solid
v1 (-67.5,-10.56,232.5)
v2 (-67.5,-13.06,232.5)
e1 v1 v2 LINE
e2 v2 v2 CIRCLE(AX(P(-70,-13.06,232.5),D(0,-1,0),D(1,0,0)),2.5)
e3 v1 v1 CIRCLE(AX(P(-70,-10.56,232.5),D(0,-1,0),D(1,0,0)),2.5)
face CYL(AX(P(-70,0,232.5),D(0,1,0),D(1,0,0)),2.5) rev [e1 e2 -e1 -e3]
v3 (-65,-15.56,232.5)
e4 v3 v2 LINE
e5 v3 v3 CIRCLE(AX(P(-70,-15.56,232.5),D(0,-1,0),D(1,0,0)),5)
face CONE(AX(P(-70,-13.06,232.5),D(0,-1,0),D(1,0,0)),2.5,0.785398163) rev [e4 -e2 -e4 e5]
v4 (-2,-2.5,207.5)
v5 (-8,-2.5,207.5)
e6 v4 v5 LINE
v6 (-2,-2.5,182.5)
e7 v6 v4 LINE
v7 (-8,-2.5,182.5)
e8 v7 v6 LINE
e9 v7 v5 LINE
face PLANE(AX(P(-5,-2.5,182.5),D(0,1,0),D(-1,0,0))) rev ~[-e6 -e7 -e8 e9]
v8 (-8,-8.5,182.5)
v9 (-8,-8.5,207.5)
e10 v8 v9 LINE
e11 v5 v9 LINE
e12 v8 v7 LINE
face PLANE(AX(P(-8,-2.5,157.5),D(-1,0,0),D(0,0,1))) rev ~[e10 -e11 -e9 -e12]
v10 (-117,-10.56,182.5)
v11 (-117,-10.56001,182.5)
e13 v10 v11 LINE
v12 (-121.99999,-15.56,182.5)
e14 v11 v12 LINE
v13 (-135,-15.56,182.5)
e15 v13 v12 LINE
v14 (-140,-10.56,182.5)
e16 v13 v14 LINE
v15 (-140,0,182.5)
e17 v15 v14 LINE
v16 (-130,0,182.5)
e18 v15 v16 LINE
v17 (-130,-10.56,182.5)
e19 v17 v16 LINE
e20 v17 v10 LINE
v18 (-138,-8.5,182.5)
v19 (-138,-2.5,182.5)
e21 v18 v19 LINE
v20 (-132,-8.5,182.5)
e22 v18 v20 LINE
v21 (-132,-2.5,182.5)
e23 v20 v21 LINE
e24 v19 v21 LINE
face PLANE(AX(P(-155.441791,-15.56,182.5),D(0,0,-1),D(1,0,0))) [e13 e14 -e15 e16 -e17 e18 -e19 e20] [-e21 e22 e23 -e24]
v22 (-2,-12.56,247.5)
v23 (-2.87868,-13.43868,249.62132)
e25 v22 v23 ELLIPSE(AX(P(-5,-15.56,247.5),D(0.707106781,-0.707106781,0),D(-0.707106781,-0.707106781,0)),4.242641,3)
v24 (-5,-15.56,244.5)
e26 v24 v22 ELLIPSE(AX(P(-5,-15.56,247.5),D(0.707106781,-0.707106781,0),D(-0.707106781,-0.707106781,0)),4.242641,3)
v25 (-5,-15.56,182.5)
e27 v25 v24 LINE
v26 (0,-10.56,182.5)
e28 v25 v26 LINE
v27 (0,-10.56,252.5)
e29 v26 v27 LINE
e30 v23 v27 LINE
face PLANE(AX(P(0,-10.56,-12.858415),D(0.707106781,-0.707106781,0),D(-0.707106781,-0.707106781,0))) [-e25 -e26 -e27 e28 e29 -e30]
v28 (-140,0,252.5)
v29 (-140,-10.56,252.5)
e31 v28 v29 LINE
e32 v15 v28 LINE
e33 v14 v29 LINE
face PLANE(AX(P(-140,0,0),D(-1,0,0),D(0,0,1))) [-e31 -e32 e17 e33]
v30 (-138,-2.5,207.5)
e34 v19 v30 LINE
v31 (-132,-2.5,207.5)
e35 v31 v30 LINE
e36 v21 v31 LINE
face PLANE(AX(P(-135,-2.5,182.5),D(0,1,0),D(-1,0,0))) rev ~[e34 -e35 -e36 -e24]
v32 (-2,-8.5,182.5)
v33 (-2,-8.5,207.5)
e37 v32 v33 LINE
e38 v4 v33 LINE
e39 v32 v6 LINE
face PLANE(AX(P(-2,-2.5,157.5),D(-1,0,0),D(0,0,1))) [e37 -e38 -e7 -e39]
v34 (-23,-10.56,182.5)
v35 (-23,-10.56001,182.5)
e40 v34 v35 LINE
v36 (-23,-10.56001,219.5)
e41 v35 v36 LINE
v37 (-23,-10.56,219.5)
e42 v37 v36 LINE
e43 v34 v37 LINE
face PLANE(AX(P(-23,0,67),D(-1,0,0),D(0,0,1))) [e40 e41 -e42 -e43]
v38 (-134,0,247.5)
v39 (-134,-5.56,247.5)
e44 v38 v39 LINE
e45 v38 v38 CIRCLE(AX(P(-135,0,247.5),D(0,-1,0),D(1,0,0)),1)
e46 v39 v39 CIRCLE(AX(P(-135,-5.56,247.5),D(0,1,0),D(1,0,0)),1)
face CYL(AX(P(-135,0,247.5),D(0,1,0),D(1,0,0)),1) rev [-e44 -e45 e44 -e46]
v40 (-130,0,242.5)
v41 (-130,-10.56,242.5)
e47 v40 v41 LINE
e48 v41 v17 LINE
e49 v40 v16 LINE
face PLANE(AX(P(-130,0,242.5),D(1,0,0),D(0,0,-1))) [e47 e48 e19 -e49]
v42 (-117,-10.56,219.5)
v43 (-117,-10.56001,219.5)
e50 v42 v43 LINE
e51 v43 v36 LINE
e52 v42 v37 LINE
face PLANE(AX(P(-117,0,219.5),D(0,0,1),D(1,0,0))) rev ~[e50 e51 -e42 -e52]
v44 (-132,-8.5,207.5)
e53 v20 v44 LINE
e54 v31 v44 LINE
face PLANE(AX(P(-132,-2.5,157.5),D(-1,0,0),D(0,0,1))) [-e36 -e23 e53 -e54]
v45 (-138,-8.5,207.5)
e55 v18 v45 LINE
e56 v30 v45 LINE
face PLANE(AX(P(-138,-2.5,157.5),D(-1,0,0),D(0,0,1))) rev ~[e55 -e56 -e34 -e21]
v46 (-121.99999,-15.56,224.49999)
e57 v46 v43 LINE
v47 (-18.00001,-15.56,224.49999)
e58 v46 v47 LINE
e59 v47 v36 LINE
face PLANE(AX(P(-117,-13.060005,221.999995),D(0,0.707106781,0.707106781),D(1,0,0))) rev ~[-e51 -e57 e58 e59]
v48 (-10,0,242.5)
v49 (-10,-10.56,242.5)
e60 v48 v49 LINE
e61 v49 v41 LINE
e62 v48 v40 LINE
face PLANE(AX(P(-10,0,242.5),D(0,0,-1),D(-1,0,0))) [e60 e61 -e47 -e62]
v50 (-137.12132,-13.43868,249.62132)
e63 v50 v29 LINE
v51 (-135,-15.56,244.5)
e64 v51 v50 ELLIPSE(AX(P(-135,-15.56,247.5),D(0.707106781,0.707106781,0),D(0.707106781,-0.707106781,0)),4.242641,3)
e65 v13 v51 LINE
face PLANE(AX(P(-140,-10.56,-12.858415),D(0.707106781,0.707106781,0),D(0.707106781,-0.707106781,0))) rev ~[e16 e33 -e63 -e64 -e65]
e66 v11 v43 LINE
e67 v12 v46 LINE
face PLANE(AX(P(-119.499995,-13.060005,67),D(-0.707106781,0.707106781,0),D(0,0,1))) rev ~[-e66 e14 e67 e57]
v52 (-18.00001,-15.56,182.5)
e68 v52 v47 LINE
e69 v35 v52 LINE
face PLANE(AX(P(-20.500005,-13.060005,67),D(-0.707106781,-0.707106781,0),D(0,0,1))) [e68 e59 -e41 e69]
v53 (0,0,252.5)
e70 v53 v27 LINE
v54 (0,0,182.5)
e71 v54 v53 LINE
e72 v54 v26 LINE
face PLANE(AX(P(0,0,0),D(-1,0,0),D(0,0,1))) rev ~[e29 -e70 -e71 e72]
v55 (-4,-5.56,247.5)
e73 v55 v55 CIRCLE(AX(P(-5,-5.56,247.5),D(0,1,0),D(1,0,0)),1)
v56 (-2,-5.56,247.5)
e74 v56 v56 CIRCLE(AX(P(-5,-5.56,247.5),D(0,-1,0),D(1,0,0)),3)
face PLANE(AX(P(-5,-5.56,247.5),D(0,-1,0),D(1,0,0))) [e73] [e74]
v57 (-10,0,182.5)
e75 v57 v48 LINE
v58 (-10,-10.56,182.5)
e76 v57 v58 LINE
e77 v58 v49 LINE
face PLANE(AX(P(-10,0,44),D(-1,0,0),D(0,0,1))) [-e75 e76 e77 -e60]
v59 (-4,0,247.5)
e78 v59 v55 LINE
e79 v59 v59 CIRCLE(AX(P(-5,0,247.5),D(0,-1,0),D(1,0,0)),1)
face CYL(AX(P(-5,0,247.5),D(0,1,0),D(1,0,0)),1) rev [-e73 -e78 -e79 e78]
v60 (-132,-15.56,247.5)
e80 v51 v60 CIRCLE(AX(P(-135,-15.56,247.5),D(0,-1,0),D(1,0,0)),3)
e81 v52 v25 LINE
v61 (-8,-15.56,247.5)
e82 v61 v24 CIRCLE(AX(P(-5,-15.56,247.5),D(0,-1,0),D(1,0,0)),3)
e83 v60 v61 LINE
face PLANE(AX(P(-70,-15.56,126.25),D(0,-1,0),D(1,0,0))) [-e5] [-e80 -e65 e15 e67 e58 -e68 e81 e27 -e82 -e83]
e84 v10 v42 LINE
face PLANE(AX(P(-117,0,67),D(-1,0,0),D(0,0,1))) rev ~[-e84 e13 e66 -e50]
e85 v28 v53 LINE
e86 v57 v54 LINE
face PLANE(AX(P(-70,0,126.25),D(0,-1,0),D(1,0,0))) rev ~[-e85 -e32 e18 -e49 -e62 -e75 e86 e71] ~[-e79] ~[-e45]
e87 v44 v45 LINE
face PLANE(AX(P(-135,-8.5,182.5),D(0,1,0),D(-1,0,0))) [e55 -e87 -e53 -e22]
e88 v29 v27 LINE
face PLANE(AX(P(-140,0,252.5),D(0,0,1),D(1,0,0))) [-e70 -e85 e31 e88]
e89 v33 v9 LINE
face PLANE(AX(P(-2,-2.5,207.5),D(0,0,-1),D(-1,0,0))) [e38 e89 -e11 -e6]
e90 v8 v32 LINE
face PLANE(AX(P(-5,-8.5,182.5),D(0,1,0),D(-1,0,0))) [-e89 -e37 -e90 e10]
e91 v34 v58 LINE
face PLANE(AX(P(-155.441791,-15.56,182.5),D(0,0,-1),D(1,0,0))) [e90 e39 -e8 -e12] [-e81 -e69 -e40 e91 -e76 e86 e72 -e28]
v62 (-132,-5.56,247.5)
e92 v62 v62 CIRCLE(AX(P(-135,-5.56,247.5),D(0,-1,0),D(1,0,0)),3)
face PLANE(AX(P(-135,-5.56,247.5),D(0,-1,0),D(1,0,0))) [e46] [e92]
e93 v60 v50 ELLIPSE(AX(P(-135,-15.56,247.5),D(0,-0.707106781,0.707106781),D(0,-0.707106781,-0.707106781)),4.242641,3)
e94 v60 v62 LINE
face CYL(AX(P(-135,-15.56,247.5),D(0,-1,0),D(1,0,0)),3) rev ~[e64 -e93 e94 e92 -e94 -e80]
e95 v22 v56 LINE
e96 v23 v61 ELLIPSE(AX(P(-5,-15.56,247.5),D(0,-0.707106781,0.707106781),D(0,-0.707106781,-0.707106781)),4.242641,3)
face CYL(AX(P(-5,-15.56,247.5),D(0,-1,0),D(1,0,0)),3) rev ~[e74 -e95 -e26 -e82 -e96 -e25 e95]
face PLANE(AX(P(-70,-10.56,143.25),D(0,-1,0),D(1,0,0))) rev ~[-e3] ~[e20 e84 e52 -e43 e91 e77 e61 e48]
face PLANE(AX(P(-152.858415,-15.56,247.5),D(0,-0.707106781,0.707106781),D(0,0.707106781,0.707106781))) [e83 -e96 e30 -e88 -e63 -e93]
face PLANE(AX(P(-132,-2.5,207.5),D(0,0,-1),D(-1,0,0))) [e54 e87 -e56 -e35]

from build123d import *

# Parameters (mm, degrees)
F0_W        = 140
F0_H        = 252.5
F0_R        = 1
F0_W_2      = 94
F0_H_2      = 152.5
F0_R_2      = 2.5
F0_W_3      = 12
F0_H_3      = 34
F1_DEPTH    = 15.56
F2_DEPTH    = 10.56
F3_T1_DEPTH = 165.7168298797
F3_T3_DEPTH = 278.2168298797
F4_SIZE     = 2.5
F5_R        = 3
F6_DEPTH    = 10
F7_SIZE     = 4.99999
F8_W        = 161.2529857084
F8_H        = 182.5
F9_DEPTH    = 25
F11_W       = 6
F11_H       = 50
F12_DEPTH   = 6


# Not quite as in the source:
# - a fillet or chamfer that OpenCascade refuses, or shapes differently, is made with other operations: its cross-section is extruded or revolved along the edge and cut away or added
# - a fillet or chamfer is up to 0.001 mm smaller than in the source, because OpenCascade refuses the exact size
# - a feature names something its author has since deleted; it is built from what else it names


with BuildPart() as f1:
    # F0 (on Front) → F1 (new body)
    with BuildSketch(Plane.XZ):
        with Locations((-70, 126.25)):
            Rectangle(F0_W, F0_H)
        with Locations((-135, 5)):
            Circle(F0_R, mode=Mode.SUBTRACT)
        with Locations((-5, 5)):
            Circle(F0_R, mode=Mode.SUBTRACT)
        with Locations((-135, 247.5)):
            Circle(F0_R, mode=Mode.SUBTRACT)
        Polygon((-130, 44), (-130, 242.5), (-10, 242.5), (-10, 44), (-64, 44), (-64, 10), (-76, 10), (-76, 44), align=None, mode=Mode.SUBTRACT)
        with Locations((-5, 247.5)):
            Circle(F0_R, mode=Mode.SUBTRACT)
        Polygon((-10, 242.5), (-130, 242.5), (-130, 44), (-76, 44), (-64, 44), (-10, 44), align=None)
        with Locations((-70, 143.25)):
            Rectangle(F0_W_2, F0_H_2, mode=Mode.SUBTRACT)
        with Locations((-70, 232.5)):
            Circle(F0_R_2, mode=Mode.SUBTRACT)
        with Locations((-70, 27)):
            Rectangle(F0_W_3, F0_H_3)
    extrude(amount=F1_DEPTH)

    # F0 (on Front) → F2 (cut)
    with BuildSketch(Plane.XZ):
        Polygon((-10, 242.5), (-130, 242.5), (-130, 44), (-76, 44), (-64, 44), (-10, 44), align=None)
        with Locations((-70, 143.25)):
            Rectangle(F0_W_2, F0_H_2, mode=Mode.SUBTRACT)
        with Locations((-70, 232.5)):
            Circle(F0_R_2, mode=Mode.SUBTRACT)
        with Locations((-70, 27)):
            Rectangle(F0_W_3, F0_H_3)
    extrude(amount=F2_DEPTH, mode=Mode.SUBTRACT)

    # F3: chamfer of 5 on 4 edges, made by hand

    # F3_s2 → F3_t1 (cut)
    with BuildSketch(Plane.YZ.offset(-152.8584149398)):
        Polygon((-10.56, 0), (-15.56, 5), (-15.56, 0), align=None)
        Polygon((-15.56, 247.5), (-10.56, 252.5), (-15.56, 252.5), align=None)
    extrude(amount=F3_T1_DEPTH, mode=Mode.SUBTRACT)

    # F3_s4 → F3_t3 (cut)
    with BuildSketch(Plane.XY.offset(-12.8584149398)):
        Polygon((-140, -10.56), (-135, -15.56), (-140, -15.56), align=None)
        Polygon((0, -10.56), (-5, -15.56), (0, -15.56), align=None)
    extrude(amount=F3_T3_DEPTH, mode=Mode.SUBTRACT)

    # F4
    f4_edges = [f1.edges().sort_by_distance(p)[0] for p in [
        (-72.5, -15.56, 232.5),
    ]]
    chamfer(f4_edges, length=F4_SIZE)

    # F5 (on face) → F6 (cut)
    with BuildSketch(Plane.XZ.offset(15.56)):
        with Locations((-135, 247.5)):
            Circle(F5_R)
        with Locations((-135, 5)):
            Circle(F5_R)
        with Locations((-5, 247.5)):
            Circle(F5_R)
        with Locations((-5, 5)):
            Circle(F5_R)
    extrude(amount=-F6_DEPTH, mode=Mode.SUBTRACT)

    # F7 (size 5 in the source; OpenCascade refuses exactly that, so slightly less here)
    f7_edges = [f1.edges().sort_by_distance(p)[0] for p in [
        (-70, -15.56, 67),
        (-117, -15.56, 143.25),
        (-23, -15.56, 143.25),
        (-70, -15.56, 219.5),
    ]]
    chamfer(f7_edges, length=F7_SIZE)

    # F8 (on face) → F9 (cut)
    with BuildSketch(Plane.XZ.offset(15.56)):
        with Locations((-74.815297965, 91.25)):
            Rectangle(F8_W, F8_H)
    extrude(amount=-F9_DEPTH, mode=Mode.SUBTRACT)

    # F11 (on offset) → F12 (cut)
    with BuildSketch(Plane(origin=(0, -2.5, 0), x_dir=(-1, 0, 0), z_dir=(0, 1, 0))):
        with Locations((135, 182.5)):
            Rectangle(F11_W, F11_H)
        with Locations((5, 182.5)):
            Rectangle(F11_W, F11_H)
    extrude(amount=-F12_DEPTH, mode=Mode.SUBTRACT)


solid = f1.part
